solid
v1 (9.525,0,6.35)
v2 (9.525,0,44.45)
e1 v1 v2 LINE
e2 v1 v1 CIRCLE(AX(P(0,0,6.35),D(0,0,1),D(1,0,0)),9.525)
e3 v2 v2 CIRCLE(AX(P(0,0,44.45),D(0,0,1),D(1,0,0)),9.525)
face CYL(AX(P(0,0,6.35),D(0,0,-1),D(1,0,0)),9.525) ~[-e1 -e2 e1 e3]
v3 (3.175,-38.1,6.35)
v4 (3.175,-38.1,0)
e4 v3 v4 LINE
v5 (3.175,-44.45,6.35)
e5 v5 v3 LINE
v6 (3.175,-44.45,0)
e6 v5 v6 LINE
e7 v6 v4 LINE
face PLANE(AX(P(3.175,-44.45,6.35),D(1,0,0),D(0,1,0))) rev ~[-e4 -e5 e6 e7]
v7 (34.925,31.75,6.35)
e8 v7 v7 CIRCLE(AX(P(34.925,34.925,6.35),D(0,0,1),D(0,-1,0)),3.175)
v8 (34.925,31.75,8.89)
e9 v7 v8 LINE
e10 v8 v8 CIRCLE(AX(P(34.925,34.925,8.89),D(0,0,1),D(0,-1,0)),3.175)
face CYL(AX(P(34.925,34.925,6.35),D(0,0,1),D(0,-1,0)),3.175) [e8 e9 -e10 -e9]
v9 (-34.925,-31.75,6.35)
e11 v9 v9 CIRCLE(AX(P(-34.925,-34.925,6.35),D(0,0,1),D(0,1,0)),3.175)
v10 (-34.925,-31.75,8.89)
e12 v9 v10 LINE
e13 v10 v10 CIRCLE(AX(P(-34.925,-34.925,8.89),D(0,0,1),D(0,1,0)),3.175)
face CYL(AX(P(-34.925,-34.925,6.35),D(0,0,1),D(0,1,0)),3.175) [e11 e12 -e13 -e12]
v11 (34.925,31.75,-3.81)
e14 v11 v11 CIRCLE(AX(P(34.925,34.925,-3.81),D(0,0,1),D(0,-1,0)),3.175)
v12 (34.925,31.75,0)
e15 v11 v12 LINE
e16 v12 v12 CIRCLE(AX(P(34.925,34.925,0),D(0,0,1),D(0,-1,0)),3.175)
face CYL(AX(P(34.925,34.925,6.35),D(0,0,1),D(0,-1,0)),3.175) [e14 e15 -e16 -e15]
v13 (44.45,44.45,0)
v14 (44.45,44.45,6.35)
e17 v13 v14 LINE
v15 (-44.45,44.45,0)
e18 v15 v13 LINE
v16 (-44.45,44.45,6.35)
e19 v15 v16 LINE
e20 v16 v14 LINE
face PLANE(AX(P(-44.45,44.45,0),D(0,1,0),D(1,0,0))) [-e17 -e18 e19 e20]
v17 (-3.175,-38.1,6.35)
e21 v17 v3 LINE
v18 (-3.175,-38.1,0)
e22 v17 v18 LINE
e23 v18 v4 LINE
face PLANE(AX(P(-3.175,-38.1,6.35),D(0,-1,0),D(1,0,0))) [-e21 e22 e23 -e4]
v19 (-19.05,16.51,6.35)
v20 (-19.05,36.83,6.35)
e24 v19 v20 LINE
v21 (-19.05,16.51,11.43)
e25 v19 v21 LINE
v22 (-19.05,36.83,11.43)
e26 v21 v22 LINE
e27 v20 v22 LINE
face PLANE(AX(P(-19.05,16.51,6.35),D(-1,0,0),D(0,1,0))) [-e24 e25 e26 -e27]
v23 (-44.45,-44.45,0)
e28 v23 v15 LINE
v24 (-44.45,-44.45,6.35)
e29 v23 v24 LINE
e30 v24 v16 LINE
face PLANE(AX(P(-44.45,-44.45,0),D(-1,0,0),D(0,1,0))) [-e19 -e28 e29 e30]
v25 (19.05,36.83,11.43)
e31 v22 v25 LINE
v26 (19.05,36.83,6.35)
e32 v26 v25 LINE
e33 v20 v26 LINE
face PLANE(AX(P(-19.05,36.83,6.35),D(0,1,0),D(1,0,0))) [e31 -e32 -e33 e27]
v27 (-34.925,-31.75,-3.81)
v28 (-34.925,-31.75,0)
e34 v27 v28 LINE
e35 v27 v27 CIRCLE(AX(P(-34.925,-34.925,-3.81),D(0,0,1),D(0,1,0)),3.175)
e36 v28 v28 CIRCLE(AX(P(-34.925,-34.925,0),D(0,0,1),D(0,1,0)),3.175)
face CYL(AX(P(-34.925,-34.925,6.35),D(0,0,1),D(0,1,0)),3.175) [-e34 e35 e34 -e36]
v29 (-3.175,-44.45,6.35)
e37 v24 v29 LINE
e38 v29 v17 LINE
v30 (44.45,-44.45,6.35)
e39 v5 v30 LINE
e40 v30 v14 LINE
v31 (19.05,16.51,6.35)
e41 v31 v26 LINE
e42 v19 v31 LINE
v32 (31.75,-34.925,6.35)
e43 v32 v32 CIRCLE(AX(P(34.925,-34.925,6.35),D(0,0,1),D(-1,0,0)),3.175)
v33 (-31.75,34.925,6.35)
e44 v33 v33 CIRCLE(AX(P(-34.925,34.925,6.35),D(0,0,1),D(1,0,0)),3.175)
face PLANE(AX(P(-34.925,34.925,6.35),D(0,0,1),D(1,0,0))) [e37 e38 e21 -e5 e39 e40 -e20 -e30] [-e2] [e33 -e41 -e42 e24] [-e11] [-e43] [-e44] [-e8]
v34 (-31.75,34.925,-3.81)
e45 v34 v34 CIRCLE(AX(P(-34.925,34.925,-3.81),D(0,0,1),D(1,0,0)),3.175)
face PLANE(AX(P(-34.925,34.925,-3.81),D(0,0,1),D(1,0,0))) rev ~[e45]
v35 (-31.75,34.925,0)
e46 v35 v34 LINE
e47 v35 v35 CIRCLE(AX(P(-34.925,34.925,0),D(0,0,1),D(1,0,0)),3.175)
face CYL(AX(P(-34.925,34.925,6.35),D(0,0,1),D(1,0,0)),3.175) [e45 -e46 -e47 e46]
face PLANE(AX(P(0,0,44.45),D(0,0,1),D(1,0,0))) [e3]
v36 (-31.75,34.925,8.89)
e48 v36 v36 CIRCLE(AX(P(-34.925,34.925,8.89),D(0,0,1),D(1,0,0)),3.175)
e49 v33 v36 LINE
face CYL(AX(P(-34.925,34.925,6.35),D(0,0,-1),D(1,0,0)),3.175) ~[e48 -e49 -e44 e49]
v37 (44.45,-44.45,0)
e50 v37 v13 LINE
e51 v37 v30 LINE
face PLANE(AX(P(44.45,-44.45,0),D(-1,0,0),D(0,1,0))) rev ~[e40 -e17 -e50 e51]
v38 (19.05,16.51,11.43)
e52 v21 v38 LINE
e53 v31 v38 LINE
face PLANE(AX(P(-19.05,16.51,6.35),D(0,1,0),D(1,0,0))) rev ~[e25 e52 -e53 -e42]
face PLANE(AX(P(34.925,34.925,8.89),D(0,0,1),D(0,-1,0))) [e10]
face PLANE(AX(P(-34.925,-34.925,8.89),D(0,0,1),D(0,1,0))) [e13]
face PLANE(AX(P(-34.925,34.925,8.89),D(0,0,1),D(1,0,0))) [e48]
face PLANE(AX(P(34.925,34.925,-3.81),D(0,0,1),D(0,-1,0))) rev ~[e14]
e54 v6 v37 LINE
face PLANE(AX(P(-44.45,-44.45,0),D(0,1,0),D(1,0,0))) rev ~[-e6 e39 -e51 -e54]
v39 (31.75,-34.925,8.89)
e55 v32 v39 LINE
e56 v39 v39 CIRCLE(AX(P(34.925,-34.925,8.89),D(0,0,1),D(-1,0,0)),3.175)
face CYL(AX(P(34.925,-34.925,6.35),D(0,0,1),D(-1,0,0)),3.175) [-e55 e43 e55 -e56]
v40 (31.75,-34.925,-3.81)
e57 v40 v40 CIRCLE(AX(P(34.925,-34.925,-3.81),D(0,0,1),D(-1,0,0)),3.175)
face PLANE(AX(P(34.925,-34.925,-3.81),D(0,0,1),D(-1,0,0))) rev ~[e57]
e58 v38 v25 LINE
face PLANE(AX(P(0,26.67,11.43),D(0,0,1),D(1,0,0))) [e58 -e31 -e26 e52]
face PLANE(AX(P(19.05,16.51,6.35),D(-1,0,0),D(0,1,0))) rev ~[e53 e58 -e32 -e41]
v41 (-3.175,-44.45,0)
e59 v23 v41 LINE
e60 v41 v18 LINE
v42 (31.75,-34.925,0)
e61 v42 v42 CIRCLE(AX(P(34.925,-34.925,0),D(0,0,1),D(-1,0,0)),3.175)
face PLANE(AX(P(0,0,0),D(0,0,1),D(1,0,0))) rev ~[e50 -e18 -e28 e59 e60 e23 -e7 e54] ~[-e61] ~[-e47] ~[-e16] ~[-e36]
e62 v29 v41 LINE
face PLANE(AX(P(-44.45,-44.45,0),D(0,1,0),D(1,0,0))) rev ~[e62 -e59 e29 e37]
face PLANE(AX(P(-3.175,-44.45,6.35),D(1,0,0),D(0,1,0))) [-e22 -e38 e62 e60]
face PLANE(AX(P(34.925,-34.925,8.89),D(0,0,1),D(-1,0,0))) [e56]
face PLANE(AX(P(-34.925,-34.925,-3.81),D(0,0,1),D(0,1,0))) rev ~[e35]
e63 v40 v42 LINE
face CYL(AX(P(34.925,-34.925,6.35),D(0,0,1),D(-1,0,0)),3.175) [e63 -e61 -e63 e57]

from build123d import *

# Parameters (mm, degrees)
F0_W            = 88.9
F0_H            = 88.9
F1_DEPTH        = 6.35
F2_R            = 9.525
F3_DEPTH        = 38.1
F4_W            = 38.1
F4_H            = 20.32
F5_DEPTH        = 5.08
F6_R            = 3.175
F7_DEPTH        = 10.16
F7_DEPTH_BACK   = 2.54
F7_COPIES_COUNT = 4
F8_W            = 6.35
F8_H            = 6.35
F9_DEPTH        = 6.35


# Not quite as in the source:
# - a pattern or mirror of a feature is missing from the dataset's text; its kind, count and spacing are read off the source's solid


with BuildPart() as f1:
    # F0 (on Top) → F1 (new body)
    with BuildSketch(Plane.XY):
        Rectangle(F0_W, F0_H)
    extrude(amount=F1_DEPTH)

    # F2 (on face) → F3 (join)
    with BuildSketch(Plane.XY.offset(6.35)):
        Circle(F2_R)
    extrude(amount=F3_DEPTH)

    # F4 (on face) → F5 (join)
    with BuildSketch(Plane.XY.offset(6.35)):
        with Locations((0, 26.67)):
            Rectangle(F4_W, F4_H)
    extrude(amount=F5_DEPTH)

    # F6 (on face) → F7 (join, two sides)
    with BuildSketch(Plane.XY.offset(6.35)) as f7_sk:
        with Locations((-34.925, 34.925)):
            Circle(F6_R)
    f7 = extrude(amount=-F7_DEPTH) + extrude(f7_sk.sketch, amount=F7_DEPTH_BACK)

    # F7_copies: F7 ×4 about axis
    f7_copies_axis = Axis((0, 0, 0), (0, 0, 1))
    for i in range(1, F7_COPIES_COUNT):
        add(f7.rotate(f7_copies_axis, i * 360 / F7_COPIES_COUNT))

    # F8 (on face) → F9 (cut)
    with BuildSketch(Plane.XY.offset(6.35)):
        with Locations((0, -41.275)):
            Rectangle(F8_W, F8_H)
    extrude(amount=-F9_DEPTH, mode=Mode.SUBTRACT)


solid = f1.part
